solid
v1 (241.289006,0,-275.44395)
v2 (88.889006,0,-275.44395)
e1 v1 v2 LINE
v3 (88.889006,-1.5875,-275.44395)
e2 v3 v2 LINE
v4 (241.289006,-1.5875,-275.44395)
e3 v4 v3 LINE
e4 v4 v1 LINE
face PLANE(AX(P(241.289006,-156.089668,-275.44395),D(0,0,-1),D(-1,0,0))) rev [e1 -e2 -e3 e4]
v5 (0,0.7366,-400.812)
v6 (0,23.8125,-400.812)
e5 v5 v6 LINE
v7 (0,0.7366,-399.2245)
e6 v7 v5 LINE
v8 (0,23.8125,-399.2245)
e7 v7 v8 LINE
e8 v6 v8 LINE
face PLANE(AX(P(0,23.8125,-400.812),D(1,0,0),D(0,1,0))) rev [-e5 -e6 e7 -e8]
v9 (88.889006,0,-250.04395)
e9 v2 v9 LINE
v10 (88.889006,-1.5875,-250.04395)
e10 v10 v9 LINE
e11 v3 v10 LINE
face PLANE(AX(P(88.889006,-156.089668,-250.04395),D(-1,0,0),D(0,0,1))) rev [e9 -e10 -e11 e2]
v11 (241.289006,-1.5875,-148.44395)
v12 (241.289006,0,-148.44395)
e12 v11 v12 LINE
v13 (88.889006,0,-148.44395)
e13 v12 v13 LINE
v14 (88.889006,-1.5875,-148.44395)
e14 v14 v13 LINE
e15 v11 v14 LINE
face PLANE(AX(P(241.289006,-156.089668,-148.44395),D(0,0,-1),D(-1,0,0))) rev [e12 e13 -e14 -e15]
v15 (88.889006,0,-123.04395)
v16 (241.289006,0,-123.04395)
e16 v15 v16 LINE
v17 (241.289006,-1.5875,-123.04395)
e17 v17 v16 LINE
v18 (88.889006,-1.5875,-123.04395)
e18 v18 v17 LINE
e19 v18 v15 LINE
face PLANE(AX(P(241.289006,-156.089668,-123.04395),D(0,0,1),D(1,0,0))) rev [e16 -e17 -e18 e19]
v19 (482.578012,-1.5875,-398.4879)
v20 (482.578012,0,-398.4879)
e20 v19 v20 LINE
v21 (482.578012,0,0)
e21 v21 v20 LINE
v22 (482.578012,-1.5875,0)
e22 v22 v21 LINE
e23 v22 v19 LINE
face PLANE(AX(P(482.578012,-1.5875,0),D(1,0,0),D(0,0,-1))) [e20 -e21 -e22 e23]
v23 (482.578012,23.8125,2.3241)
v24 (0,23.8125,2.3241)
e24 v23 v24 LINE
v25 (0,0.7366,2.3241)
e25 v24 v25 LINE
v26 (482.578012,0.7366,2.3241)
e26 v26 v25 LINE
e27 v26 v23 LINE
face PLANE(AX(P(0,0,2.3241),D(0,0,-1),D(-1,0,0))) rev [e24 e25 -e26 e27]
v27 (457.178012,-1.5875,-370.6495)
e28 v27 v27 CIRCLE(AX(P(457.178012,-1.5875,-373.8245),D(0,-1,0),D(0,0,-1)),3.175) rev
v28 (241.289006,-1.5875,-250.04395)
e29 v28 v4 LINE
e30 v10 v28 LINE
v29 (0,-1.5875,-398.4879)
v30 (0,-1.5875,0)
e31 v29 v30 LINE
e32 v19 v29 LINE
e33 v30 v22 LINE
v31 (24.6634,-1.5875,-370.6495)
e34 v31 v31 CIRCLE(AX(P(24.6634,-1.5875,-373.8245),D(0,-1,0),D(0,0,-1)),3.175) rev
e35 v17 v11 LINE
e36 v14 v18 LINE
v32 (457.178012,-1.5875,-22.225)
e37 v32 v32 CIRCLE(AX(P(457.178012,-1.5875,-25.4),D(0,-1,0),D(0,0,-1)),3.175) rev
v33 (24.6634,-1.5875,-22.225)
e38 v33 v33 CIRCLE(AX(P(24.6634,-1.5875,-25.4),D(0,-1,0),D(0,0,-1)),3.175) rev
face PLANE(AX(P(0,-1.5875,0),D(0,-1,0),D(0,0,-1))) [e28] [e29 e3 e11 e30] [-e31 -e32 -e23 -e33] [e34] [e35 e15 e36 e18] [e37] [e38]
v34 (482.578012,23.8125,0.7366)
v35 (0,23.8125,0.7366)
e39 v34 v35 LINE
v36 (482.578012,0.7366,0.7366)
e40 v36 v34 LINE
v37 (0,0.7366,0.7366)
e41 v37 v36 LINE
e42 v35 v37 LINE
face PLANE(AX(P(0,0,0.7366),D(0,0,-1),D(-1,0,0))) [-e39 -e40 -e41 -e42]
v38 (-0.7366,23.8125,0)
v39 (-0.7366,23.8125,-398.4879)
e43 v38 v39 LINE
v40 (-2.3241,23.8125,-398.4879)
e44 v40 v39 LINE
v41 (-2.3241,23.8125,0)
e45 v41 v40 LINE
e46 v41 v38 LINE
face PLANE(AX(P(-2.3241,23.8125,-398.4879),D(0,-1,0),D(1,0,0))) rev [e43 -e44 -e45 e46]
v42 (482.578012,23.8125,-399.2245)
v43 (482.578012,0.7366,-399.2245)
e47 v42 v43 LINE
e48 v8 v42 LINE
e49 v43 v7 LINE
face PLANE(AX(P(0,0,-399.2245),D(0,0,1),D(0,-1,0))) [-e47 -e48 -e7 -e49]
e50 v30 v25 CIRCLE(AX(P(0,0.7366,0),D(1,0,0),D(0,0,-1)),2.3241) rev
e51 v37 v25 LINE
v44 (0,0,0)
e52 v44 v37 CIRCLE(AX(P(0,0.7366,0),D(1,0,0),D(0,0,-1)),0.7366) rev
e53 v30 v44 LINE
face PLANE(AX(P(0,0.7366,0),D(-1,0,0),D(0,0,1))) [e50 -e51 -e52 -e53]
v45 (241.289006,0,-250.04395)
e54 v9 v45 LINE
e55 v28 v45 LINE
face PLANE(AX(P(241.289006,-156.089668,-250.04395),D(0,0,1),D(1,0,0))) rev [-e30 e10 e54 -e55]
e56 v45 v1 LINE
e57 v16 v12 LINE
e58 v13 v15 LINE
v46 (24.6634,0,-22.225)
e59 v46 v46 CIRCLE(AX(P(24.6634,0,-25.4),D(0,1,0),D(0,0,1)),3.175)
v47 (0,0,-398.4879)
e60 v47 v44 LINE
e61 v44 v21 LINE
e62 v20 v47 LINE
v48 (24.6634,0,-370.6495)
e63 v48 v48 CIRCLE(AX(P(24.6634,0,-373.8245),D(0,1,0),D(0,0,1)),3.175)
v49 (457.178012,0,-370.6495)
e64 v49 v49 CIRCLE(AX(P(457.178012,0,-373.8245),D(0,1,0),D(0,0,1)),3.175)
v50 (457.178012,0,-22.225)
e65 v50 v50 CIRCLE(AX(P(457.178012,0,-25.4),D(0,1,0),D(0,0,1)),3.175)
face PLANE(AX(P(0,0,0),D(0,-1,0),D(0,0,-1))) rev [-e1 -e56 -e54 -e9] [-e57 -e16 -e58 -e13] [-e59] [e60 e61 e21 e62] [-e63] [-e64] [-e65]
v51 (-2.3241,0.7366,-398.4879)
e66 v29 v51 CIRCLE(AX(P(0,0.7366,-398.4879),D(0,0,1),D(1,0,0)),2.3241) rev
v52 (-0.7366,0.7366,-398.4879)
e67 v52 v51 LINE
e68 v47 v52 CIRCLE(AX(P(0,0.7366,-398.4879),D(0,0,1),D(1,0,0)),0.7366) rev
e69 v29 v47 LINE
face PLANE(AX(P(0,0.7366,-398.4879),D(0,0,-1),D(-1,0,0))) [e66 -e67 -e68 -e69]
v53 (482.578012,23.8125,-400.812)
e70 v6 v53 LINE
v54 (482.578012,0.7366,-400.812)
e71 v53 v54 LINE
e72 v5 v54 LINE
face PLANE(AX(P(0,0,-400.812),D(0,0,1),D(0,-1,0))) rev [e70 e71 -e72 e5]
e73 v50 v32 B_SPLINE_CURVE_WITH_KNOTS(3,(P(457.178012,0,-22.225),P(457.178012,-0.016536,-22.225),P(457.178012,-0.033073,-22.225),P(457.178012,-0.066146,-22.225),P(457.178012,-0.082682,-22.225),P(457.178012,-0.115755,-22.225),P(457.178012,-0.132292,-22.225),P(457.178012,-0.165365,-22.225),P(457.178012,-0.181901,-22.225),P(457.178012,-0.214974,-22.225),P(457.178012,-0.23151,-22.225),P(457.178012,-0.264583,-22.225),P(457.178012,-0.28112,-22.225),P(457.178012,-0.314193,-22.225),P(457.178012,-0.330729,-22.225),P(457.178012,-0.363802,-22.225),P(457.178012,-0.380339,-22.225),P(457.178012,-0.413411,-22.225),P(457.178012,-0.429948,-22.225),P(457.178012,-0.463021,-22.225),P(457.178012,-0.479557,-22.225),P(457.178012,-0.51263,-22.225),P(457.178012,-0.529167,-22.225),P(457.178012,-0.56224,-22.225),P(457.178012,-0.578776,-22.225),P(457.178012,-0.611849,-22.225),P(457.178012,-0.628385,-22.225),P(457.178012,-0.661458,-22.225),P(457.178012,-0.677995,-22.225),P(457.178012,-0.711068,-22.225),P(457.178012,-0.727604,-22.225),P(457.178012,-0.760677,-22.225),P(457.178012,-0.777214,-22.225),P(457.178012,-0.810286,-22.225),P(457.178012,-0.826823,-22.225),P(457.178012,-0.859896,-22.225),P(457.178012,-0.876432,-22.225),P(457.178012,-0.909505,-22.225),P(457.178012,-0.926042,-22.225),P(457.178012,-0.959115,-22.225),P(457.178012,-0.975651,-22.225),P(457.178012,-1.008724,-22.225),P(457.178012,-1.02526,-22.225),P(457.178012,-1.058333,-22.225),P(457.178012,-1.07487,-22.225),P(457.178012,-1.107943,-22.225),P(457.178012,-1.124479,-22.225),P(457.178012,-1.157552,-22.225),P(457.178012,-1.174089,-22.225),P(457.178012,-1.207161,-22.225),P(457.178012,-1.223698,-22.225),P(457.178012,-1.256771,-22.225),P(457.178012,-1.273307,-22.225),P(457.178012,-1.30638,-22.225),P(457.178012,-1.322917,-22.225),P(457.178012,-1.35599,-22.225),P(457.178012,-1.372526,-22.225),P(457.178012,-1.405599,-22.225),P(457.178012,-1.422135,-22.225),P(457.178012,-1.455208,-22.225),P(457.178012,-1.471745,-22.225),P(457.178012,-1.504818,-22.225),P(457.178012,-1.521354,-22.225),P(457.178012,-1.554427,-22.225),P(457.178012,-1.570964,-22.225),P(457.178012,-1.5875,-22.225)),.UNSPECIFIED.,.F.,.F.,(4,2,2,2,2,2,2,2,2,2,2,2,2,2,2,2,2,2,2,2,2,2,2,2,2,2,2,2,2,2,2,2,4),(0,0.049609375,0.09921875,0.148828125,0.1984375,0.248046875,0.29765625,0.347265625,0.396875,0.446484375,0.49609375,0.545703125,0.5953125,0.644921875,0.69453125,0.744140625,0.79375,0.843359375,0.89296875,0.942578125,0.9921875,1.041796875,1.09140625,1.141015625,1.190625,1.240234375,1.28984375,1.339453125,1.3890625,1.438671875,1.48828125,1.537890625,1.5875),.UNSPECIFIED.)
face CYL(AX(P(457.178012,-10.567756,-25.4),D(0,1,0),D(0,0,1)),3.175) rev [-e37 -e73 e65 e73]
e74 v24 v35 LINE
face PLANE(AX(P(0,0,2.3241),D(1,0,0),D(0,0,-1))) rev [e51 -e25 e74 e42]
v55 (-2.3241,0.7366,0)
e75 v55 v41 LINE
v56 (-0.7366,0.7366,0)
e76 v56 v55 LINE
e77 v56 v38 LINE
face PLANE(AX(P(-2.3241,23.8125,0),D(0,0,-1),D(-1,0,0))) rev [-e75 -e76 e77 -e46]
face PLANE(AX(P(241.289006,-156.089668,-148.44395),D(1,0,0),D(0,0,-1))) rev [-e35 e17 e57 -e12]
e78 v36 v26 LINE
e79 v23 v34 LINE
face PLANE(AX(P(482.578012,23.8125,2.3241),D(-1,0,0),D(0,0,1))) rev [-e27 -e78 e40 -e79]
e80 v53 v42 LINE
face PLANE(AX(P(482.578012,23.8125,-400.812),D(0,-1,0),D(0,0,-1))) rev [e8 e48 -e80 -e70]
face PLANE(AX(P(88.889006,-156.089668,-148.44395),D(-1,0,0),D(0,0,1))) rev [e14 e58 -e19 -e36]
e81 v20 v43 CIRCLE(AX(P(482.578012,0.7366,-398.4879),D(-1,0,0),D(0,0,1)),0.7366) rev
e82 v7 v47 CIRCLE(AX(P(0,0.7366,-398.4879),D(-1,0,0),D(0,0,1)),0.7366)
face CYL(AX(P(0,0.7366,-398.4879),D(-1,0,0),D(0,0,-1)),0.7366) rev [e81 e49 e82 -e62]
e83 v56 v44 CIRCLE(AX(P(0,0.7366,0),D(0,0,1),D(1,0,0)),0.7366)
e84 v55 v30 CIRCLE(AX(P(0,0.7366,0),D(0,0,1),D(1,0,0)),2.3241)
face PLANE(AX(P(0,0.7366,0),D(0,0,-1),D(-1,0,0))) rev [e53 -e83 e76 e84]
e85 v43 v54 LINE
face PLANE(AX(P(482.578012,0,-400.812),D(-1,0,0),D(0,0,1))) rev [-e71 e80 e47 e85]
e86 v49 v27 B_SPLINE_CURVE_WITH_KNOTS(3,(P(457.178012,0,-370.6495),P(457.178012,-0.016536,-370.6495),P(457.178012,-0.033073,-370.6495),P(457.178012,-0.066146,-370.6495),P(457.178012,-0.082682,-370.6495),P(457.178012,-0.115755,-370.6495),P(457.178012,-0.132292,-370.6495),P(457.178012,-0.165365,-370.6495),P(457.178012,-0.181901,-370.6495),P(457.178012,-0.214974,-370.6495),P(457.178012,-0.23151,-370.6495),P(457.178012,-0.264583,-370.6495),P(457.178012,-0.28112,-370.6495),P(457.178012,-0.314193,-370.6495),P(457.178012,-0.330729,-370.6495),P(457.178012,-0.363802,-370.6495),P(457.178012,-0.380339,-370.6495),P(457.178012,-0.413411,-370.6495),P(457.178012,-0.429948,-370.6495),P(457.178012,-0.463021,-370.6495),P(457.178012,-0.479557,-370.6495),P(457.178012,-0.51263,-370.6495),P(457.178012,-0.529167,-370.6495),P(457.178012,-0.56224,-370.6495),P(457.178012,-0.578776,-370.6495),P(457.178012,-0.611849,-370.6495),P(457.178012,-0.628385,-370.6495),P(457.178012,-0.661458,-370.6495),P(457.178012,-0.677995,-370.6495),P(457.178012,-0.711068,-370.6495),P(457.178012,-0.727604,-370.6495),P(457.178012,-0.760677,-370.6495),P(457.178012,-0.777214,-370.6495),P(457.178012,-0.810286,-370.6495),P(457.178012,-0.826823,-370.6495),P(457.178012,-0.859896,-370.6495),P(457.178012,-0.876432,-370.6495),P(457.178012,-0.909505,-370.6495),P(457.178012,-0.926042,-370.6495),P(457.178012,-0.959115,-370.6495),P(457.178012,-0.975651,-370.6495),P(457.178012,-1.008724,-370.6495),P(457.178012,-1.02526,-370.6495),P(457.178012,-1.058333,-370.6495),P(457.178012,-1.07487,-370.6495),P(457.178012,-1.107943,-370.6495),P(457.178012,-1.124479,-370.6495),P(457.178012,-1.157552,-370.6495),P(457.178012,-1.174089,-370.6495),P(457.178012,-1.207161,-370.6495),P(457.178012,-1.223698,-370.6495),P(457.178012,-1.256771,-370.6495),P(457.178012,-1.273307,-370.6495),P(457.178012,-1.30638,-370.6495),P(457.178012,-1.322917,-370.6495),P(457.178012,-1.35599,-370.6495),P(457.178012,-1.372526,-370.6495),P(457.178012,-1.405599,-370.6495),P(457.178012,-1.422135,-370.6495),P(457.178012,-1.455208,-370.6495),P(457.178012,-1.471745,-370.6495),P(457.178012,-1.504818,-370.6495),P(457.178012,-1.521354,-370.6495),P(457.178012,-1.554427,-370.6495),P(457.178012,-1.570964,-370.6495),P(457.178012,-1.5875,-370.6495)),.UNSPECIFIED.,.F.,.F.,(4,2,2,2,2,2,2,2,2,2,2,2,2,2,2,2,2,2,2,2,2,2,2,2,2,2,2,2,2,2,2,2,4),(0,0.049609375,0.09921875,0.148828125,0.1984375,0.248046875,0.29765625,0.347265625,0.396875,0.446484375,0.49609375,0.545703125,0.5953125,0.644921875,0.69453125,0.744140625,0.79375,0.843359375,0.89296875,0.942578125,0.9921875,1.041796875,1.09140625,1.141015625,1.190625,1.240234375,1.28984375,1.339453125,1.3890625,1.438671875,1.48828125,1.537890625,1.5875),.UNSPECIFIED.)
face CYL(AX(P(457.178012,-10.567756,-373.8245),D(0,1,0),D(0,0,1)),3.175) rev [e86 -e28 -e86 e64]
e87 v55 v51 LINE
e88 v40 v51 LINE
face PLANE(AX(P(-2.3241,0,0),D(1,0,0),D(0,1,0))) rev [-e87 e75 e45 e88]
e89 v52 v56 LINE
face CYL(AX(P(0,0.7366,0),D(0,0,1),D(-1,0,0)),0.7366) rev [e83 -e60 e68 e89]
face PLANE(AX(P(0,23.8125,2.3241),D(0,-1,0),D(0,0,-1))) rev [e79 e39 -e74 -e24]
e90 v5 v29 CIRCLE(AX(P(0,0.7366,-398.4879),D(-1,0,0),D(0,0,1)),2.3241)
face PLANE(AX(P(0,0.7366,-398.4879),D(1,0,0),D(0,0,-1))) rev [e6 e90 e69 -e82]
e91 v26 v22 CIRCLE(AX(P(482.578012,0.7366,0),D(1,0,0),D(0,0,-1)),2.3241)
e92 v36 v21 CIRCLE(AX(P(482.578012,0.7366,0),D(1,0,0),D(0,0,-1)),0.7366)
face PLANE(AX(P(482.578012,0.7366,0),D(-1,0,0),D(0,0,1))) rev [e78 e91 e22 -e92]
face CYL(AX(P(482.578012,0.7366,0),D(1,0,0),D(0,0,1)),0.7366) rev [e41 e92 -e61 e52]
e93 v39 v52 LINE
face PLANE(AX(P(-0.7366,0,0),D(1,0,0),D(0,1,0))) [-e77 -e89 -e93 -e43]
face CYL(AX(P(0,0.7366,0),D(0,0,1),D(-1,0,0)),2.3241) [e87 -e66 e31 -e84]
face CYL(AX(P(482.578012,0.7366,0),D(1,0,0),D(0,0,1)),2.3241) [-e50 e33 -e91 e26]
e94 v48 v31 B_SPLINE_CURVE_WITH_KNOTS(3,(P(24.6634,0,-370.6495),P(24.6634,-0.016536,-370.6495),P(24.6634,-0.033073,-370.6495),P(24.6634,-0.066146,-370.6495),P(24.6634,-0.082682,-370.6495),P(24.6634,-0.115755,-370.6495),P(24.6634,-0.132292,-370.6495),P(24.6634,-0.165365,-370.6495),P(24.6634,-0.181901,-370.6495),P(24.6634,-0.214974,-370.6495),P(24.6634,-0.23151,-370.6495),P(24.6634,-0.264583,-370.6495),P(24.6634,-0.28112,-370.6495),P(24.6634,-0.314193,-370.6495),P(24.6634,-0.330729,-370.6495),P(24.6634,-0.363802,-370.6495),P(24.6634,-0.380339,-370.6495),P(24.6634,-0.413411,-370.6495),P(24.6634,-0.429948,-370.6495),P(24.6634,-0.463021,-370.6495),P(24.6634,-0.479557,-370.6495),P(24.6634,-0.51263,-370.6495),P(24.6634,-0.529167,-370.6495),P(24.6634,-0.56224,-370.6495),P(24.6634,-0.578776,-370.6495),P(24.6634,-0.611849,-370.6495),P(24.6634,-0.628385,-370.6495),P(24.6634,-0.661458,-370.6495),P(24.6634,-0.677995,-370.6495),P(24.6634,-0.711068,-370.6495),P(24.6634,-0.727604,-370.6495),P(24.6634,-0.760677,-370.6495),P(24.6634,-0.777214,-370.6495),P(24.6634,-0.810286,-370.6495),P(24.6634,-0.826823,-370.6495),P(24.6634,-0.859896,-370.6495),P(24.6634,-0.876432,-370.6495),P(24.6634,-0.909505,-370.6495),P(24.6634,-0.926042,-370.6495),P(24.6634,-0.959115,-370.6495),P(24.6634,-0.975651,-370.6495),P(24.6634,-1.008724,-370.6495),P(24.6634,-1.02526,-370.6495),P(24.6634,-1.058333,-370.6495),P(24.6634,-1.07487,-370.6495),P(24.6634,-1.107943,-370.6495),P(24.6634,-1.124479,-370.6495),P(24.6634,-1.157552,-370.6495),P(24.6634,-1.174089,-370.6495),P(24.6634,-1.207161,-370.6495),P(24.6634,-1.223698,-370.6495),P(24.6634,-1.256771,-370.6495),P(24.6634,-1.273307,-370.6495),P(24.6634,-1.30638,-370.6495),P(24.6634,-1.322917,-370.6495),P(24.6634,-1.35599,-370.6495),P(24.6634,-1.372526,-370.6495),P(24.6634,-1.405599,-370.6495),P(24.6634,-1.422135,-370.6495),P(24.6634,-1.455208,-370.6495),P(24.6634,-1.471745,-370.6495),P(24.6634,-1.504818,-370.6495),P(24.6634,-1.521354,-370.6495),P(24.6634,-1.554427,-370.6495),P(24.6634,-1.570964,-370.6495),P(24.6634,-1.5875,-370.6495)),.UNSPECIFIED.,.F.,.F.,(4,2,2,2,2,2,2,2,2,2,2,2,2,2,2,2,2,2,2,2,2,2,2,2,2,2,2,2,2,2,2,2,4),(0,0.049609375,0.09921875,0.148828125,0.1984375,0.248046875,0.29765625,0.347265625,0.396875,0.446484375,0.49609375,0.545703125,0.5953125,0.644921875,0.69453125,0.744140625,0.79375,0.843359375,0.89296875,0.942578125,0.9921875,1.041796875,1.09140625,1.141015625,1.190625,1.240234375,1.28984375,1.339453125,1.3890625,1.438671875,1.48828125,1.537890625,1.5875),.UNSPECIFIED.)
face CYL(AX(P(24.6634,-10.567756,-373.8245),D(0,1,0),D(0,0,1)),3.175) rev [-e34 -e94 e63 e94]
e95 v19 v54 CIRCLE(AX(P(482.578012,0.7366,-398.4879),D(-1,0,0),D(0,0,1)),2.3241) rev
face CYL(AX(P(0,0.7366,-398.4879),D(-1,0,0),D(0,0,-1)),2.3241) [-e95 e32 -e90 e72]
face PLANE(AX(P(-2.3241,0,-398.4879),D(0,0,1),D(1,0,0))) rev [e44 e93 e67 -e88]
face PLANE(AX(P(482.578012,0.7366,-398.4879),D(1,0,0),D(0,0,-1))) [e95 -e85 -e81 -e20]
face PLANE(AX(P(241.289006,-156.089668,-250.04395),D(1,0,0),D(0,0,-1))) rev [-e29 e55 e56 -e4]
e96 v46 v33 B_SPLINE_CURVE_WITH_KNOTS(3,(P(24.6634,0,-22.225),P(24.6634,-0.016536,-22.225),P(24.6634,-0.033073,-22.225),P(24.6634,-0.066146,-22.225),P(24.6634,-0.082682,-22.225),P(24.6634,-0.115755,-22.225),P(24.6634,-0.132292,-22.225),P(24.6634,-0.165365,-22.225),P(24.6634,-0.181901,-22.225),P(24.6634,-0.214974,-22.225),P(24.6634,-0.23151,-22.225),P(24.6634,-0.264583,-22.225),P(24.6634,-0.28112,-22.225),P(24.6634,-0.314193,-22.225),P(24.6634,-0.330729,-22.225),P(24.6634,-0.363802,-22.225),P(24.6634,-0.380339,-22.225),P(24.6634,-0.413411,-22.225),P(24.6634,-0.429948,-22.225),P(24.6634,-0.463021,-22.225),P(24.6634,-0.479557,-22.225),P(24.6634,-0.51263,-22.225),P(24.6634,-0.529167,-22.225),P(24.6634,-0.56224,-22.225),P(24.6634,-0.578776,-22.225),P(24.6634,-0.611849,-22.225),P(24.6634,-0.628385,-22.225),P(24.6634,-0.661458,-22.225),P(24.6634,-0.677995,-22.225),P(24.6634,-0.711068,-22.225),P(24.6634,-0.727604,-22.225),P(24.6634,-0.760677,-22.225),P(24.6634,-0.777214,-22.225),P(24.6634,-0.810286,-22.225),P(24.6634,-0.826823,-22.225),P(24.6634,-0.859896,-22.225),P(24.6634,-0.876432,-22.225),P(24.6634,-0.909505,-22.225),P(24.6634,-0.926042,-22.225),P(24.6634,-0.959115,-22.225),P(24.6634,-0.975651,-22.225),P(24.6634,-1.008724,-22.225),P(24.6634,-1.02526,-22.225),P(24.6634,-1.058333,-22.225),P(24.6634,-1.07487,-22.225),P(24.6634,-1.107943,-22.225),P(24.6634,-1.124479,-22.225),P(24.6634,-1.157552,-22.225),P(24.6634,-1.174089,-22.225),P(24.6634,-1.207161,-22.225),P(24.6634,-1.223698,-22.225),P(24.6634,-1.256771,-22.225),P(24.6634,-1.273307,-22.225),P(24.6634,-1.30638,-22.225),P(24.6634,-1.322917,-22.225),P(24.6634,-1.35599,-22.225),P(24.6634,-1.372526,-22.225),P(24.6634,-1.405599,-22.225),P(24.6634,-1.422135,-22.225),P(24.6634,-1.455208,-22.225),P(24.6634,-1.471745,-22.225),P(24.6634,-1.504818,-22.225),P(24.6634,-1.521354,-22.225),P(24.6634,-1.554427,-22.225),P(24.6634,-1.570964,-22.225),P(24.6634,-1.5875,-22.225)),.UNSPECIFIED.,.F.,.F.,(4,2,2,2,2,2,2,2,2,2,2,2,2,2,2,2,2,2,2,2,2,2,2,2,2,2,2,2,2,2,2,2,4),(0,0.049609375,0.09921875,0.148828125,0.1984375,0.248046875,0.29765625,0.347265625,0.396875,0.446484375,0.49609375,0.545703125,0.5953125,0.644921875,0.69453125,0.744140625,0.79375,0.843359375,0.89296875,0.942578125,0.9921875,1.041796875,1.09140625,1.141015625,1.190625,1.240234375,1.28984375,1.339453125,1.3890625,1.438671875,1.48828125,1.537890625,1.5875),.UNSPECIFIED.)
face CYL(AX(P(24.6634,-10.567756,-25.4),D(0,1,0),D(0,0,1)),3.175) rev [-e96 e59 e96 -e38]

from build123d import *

# Parameters (mm, degrees)
SKETCH3_W          = 482.5780122
SKETCH3_H          = 398.4879
BASE_FLANGE1_DEPTH = 1.5875
EDGE_FLANGE1_DEPTH = 482.5780122
EDGE_FLANGE2_DEPTH = 482.5780122
EDGE_FLANGE4_DEPTH = 398.4879
SKETCH20_W         = 152.4
SKETCH20_H         = 25.4
CUT_EXTRUDE1_DEPTH = 1.5875
SKETCH21_R         = 3.175
CUT_EXTRUDE2_DEPTH = 1.5875


# Sheet-metal steps are written as plain solids
with BuildPart() as part:
    # Sketch3 → Base-Flange1 (new body)
    with BuildSketch(Plane(origin=(0, 0, 0), x_dir=(1, 0, 0), z_dir=(0, 1, 0))):
        with Locations((241.2890061, 199.24395)):
            Rectangle(SKETCH3_W, SKETCH3_H)
    extrude(amount=-BASE_FLANGE1_DEPTH)

    # Edge-Flange1 section (across the edge) → Edge-Flange1 (add)
    with BuildSketch(Plane(origin=(0, 0, 0.7366), x_dir=(0, 0, -1), z_dir=(1, 0, 0))):
        with BuildLine():
            Line((-1.5875, 0.7366), (-1.5875, 23.8125))
            Line((-1.5875, 23.8125), (0, 23.8125))
            Line((0, 23.8125), (0, 0.7366))
            ThreePointArc((0, 0.7366), (0.215745145, 0.215745145), (0.7366, 0))
            Line((0.7366, 0), (0.7366, -1.5875))
            ThreePointArc((0.7366, -1.5875), (-0.90678687, -0.90678687), (-1.5875, 0.7366))
        make_face()
    extrude(amount=EDGE_FLANGE1_DEPTH)

    # Edge-Flange2 section (across the edge) → Edge-Flange2 (add)
    with BuildSketch(Plane(origin=(482.5780122, 0, -399.2245), x_dir=(0, 0, 1), z_dir=(-1, 0, 0))):
        with BuildLine():
            Line((-1.5875, 0.7366), (-1.5875, 23.8125))
            Line((-1.5875, 23.8125), (0, 23.8125))
            Line((0, 23.8125), (0, 0.7366))
            ThreePointArc((0, 0.7366), (0.215745145, 0.215745145), (0.7366, 0))
            Line((0.7366, 0), (0.7366, -1.5875))
            ThreePointArc((0.7366, -1.5875), (-0.90678687, -0.90678687), (-1.5875, 0.7366))
        make_face()
    extrude(amount=EDGE_FLANGE2_DEPTH)

    # Edge-Flange4 section (across the edge) → Edge-Flange4 (add)
    with BuildSketch(Plane(origin=(-0.7366, 0, -398.4879), x_dir=(1, 0, 0), z_dir=(0, 0, 1))):
        with BuildLine():
            Line((-1.5875, 0.7366), (-1.5875, 23.8125))
            Line((-1.5875, 23.8125), (0, 23.8125))
            Line((0, 23.8125), (0, 0.7366))
            ThreePointArc((0, 0.7366), (0.215745145, 0.215745145), (0.7366, 0))
            Line((0.7366, 0), (0.7366, -1.5875))
            ThreePointArc((0.7366, -1.5875), (-0.90678687, -0.90678687), (-1.5875, 0.7366))
        make_face()
    extrude(amount=EDGE_FLANGE4_DEPTH)

    # Sketch20 → Cut-Extrude1 (cut)
    with BuildSketch(Plane(origin=(0, 0, 0), x_dir=(1, 0, 0), z_dir=(0, 1, 0))):
        with Locations((165.0890061, 135.74395)):
            Rectangle(SKETCH20_W, SKETCH20_H)
        with Locations((165.0890061, 262.74395)):
            Rectangle(SKETCH20_W, SKETCH20_H)
    extrude(amount=-CUT_EXTRUDE1_DEPTH, mode=Mode.SUBTRACT)

    # Sketch21 → Cut-Extrude2 (cut)
    with BuildSketch(Plane(origin=(0, 0, 0), x_dir=(1, 0, 0), z_dir=(0, 1, 0))):
        with Locations(Location((24.6634, 373.8245, 0), (0, 0, 270))):
            Circle(SKETCH21_R)
        with Locations(Location((457.1780122, 373.8245, 0), (0, 0, 270))):
            Circle(SKETCH21_R)
        with Locations(Location((457.1780122, 25.4, 0), (0, 0, 270))):
            Circle(SKETCH21_R)
        with Locations(Location((24.6634, 25.4, 0), (0, 0, 270))):
            Circle(SKETCH21_R)
    extrude(amount=-CUT_EXTRUDE2_DEPTH, mode=Mode.SUBTRACT)


solid = part.part
